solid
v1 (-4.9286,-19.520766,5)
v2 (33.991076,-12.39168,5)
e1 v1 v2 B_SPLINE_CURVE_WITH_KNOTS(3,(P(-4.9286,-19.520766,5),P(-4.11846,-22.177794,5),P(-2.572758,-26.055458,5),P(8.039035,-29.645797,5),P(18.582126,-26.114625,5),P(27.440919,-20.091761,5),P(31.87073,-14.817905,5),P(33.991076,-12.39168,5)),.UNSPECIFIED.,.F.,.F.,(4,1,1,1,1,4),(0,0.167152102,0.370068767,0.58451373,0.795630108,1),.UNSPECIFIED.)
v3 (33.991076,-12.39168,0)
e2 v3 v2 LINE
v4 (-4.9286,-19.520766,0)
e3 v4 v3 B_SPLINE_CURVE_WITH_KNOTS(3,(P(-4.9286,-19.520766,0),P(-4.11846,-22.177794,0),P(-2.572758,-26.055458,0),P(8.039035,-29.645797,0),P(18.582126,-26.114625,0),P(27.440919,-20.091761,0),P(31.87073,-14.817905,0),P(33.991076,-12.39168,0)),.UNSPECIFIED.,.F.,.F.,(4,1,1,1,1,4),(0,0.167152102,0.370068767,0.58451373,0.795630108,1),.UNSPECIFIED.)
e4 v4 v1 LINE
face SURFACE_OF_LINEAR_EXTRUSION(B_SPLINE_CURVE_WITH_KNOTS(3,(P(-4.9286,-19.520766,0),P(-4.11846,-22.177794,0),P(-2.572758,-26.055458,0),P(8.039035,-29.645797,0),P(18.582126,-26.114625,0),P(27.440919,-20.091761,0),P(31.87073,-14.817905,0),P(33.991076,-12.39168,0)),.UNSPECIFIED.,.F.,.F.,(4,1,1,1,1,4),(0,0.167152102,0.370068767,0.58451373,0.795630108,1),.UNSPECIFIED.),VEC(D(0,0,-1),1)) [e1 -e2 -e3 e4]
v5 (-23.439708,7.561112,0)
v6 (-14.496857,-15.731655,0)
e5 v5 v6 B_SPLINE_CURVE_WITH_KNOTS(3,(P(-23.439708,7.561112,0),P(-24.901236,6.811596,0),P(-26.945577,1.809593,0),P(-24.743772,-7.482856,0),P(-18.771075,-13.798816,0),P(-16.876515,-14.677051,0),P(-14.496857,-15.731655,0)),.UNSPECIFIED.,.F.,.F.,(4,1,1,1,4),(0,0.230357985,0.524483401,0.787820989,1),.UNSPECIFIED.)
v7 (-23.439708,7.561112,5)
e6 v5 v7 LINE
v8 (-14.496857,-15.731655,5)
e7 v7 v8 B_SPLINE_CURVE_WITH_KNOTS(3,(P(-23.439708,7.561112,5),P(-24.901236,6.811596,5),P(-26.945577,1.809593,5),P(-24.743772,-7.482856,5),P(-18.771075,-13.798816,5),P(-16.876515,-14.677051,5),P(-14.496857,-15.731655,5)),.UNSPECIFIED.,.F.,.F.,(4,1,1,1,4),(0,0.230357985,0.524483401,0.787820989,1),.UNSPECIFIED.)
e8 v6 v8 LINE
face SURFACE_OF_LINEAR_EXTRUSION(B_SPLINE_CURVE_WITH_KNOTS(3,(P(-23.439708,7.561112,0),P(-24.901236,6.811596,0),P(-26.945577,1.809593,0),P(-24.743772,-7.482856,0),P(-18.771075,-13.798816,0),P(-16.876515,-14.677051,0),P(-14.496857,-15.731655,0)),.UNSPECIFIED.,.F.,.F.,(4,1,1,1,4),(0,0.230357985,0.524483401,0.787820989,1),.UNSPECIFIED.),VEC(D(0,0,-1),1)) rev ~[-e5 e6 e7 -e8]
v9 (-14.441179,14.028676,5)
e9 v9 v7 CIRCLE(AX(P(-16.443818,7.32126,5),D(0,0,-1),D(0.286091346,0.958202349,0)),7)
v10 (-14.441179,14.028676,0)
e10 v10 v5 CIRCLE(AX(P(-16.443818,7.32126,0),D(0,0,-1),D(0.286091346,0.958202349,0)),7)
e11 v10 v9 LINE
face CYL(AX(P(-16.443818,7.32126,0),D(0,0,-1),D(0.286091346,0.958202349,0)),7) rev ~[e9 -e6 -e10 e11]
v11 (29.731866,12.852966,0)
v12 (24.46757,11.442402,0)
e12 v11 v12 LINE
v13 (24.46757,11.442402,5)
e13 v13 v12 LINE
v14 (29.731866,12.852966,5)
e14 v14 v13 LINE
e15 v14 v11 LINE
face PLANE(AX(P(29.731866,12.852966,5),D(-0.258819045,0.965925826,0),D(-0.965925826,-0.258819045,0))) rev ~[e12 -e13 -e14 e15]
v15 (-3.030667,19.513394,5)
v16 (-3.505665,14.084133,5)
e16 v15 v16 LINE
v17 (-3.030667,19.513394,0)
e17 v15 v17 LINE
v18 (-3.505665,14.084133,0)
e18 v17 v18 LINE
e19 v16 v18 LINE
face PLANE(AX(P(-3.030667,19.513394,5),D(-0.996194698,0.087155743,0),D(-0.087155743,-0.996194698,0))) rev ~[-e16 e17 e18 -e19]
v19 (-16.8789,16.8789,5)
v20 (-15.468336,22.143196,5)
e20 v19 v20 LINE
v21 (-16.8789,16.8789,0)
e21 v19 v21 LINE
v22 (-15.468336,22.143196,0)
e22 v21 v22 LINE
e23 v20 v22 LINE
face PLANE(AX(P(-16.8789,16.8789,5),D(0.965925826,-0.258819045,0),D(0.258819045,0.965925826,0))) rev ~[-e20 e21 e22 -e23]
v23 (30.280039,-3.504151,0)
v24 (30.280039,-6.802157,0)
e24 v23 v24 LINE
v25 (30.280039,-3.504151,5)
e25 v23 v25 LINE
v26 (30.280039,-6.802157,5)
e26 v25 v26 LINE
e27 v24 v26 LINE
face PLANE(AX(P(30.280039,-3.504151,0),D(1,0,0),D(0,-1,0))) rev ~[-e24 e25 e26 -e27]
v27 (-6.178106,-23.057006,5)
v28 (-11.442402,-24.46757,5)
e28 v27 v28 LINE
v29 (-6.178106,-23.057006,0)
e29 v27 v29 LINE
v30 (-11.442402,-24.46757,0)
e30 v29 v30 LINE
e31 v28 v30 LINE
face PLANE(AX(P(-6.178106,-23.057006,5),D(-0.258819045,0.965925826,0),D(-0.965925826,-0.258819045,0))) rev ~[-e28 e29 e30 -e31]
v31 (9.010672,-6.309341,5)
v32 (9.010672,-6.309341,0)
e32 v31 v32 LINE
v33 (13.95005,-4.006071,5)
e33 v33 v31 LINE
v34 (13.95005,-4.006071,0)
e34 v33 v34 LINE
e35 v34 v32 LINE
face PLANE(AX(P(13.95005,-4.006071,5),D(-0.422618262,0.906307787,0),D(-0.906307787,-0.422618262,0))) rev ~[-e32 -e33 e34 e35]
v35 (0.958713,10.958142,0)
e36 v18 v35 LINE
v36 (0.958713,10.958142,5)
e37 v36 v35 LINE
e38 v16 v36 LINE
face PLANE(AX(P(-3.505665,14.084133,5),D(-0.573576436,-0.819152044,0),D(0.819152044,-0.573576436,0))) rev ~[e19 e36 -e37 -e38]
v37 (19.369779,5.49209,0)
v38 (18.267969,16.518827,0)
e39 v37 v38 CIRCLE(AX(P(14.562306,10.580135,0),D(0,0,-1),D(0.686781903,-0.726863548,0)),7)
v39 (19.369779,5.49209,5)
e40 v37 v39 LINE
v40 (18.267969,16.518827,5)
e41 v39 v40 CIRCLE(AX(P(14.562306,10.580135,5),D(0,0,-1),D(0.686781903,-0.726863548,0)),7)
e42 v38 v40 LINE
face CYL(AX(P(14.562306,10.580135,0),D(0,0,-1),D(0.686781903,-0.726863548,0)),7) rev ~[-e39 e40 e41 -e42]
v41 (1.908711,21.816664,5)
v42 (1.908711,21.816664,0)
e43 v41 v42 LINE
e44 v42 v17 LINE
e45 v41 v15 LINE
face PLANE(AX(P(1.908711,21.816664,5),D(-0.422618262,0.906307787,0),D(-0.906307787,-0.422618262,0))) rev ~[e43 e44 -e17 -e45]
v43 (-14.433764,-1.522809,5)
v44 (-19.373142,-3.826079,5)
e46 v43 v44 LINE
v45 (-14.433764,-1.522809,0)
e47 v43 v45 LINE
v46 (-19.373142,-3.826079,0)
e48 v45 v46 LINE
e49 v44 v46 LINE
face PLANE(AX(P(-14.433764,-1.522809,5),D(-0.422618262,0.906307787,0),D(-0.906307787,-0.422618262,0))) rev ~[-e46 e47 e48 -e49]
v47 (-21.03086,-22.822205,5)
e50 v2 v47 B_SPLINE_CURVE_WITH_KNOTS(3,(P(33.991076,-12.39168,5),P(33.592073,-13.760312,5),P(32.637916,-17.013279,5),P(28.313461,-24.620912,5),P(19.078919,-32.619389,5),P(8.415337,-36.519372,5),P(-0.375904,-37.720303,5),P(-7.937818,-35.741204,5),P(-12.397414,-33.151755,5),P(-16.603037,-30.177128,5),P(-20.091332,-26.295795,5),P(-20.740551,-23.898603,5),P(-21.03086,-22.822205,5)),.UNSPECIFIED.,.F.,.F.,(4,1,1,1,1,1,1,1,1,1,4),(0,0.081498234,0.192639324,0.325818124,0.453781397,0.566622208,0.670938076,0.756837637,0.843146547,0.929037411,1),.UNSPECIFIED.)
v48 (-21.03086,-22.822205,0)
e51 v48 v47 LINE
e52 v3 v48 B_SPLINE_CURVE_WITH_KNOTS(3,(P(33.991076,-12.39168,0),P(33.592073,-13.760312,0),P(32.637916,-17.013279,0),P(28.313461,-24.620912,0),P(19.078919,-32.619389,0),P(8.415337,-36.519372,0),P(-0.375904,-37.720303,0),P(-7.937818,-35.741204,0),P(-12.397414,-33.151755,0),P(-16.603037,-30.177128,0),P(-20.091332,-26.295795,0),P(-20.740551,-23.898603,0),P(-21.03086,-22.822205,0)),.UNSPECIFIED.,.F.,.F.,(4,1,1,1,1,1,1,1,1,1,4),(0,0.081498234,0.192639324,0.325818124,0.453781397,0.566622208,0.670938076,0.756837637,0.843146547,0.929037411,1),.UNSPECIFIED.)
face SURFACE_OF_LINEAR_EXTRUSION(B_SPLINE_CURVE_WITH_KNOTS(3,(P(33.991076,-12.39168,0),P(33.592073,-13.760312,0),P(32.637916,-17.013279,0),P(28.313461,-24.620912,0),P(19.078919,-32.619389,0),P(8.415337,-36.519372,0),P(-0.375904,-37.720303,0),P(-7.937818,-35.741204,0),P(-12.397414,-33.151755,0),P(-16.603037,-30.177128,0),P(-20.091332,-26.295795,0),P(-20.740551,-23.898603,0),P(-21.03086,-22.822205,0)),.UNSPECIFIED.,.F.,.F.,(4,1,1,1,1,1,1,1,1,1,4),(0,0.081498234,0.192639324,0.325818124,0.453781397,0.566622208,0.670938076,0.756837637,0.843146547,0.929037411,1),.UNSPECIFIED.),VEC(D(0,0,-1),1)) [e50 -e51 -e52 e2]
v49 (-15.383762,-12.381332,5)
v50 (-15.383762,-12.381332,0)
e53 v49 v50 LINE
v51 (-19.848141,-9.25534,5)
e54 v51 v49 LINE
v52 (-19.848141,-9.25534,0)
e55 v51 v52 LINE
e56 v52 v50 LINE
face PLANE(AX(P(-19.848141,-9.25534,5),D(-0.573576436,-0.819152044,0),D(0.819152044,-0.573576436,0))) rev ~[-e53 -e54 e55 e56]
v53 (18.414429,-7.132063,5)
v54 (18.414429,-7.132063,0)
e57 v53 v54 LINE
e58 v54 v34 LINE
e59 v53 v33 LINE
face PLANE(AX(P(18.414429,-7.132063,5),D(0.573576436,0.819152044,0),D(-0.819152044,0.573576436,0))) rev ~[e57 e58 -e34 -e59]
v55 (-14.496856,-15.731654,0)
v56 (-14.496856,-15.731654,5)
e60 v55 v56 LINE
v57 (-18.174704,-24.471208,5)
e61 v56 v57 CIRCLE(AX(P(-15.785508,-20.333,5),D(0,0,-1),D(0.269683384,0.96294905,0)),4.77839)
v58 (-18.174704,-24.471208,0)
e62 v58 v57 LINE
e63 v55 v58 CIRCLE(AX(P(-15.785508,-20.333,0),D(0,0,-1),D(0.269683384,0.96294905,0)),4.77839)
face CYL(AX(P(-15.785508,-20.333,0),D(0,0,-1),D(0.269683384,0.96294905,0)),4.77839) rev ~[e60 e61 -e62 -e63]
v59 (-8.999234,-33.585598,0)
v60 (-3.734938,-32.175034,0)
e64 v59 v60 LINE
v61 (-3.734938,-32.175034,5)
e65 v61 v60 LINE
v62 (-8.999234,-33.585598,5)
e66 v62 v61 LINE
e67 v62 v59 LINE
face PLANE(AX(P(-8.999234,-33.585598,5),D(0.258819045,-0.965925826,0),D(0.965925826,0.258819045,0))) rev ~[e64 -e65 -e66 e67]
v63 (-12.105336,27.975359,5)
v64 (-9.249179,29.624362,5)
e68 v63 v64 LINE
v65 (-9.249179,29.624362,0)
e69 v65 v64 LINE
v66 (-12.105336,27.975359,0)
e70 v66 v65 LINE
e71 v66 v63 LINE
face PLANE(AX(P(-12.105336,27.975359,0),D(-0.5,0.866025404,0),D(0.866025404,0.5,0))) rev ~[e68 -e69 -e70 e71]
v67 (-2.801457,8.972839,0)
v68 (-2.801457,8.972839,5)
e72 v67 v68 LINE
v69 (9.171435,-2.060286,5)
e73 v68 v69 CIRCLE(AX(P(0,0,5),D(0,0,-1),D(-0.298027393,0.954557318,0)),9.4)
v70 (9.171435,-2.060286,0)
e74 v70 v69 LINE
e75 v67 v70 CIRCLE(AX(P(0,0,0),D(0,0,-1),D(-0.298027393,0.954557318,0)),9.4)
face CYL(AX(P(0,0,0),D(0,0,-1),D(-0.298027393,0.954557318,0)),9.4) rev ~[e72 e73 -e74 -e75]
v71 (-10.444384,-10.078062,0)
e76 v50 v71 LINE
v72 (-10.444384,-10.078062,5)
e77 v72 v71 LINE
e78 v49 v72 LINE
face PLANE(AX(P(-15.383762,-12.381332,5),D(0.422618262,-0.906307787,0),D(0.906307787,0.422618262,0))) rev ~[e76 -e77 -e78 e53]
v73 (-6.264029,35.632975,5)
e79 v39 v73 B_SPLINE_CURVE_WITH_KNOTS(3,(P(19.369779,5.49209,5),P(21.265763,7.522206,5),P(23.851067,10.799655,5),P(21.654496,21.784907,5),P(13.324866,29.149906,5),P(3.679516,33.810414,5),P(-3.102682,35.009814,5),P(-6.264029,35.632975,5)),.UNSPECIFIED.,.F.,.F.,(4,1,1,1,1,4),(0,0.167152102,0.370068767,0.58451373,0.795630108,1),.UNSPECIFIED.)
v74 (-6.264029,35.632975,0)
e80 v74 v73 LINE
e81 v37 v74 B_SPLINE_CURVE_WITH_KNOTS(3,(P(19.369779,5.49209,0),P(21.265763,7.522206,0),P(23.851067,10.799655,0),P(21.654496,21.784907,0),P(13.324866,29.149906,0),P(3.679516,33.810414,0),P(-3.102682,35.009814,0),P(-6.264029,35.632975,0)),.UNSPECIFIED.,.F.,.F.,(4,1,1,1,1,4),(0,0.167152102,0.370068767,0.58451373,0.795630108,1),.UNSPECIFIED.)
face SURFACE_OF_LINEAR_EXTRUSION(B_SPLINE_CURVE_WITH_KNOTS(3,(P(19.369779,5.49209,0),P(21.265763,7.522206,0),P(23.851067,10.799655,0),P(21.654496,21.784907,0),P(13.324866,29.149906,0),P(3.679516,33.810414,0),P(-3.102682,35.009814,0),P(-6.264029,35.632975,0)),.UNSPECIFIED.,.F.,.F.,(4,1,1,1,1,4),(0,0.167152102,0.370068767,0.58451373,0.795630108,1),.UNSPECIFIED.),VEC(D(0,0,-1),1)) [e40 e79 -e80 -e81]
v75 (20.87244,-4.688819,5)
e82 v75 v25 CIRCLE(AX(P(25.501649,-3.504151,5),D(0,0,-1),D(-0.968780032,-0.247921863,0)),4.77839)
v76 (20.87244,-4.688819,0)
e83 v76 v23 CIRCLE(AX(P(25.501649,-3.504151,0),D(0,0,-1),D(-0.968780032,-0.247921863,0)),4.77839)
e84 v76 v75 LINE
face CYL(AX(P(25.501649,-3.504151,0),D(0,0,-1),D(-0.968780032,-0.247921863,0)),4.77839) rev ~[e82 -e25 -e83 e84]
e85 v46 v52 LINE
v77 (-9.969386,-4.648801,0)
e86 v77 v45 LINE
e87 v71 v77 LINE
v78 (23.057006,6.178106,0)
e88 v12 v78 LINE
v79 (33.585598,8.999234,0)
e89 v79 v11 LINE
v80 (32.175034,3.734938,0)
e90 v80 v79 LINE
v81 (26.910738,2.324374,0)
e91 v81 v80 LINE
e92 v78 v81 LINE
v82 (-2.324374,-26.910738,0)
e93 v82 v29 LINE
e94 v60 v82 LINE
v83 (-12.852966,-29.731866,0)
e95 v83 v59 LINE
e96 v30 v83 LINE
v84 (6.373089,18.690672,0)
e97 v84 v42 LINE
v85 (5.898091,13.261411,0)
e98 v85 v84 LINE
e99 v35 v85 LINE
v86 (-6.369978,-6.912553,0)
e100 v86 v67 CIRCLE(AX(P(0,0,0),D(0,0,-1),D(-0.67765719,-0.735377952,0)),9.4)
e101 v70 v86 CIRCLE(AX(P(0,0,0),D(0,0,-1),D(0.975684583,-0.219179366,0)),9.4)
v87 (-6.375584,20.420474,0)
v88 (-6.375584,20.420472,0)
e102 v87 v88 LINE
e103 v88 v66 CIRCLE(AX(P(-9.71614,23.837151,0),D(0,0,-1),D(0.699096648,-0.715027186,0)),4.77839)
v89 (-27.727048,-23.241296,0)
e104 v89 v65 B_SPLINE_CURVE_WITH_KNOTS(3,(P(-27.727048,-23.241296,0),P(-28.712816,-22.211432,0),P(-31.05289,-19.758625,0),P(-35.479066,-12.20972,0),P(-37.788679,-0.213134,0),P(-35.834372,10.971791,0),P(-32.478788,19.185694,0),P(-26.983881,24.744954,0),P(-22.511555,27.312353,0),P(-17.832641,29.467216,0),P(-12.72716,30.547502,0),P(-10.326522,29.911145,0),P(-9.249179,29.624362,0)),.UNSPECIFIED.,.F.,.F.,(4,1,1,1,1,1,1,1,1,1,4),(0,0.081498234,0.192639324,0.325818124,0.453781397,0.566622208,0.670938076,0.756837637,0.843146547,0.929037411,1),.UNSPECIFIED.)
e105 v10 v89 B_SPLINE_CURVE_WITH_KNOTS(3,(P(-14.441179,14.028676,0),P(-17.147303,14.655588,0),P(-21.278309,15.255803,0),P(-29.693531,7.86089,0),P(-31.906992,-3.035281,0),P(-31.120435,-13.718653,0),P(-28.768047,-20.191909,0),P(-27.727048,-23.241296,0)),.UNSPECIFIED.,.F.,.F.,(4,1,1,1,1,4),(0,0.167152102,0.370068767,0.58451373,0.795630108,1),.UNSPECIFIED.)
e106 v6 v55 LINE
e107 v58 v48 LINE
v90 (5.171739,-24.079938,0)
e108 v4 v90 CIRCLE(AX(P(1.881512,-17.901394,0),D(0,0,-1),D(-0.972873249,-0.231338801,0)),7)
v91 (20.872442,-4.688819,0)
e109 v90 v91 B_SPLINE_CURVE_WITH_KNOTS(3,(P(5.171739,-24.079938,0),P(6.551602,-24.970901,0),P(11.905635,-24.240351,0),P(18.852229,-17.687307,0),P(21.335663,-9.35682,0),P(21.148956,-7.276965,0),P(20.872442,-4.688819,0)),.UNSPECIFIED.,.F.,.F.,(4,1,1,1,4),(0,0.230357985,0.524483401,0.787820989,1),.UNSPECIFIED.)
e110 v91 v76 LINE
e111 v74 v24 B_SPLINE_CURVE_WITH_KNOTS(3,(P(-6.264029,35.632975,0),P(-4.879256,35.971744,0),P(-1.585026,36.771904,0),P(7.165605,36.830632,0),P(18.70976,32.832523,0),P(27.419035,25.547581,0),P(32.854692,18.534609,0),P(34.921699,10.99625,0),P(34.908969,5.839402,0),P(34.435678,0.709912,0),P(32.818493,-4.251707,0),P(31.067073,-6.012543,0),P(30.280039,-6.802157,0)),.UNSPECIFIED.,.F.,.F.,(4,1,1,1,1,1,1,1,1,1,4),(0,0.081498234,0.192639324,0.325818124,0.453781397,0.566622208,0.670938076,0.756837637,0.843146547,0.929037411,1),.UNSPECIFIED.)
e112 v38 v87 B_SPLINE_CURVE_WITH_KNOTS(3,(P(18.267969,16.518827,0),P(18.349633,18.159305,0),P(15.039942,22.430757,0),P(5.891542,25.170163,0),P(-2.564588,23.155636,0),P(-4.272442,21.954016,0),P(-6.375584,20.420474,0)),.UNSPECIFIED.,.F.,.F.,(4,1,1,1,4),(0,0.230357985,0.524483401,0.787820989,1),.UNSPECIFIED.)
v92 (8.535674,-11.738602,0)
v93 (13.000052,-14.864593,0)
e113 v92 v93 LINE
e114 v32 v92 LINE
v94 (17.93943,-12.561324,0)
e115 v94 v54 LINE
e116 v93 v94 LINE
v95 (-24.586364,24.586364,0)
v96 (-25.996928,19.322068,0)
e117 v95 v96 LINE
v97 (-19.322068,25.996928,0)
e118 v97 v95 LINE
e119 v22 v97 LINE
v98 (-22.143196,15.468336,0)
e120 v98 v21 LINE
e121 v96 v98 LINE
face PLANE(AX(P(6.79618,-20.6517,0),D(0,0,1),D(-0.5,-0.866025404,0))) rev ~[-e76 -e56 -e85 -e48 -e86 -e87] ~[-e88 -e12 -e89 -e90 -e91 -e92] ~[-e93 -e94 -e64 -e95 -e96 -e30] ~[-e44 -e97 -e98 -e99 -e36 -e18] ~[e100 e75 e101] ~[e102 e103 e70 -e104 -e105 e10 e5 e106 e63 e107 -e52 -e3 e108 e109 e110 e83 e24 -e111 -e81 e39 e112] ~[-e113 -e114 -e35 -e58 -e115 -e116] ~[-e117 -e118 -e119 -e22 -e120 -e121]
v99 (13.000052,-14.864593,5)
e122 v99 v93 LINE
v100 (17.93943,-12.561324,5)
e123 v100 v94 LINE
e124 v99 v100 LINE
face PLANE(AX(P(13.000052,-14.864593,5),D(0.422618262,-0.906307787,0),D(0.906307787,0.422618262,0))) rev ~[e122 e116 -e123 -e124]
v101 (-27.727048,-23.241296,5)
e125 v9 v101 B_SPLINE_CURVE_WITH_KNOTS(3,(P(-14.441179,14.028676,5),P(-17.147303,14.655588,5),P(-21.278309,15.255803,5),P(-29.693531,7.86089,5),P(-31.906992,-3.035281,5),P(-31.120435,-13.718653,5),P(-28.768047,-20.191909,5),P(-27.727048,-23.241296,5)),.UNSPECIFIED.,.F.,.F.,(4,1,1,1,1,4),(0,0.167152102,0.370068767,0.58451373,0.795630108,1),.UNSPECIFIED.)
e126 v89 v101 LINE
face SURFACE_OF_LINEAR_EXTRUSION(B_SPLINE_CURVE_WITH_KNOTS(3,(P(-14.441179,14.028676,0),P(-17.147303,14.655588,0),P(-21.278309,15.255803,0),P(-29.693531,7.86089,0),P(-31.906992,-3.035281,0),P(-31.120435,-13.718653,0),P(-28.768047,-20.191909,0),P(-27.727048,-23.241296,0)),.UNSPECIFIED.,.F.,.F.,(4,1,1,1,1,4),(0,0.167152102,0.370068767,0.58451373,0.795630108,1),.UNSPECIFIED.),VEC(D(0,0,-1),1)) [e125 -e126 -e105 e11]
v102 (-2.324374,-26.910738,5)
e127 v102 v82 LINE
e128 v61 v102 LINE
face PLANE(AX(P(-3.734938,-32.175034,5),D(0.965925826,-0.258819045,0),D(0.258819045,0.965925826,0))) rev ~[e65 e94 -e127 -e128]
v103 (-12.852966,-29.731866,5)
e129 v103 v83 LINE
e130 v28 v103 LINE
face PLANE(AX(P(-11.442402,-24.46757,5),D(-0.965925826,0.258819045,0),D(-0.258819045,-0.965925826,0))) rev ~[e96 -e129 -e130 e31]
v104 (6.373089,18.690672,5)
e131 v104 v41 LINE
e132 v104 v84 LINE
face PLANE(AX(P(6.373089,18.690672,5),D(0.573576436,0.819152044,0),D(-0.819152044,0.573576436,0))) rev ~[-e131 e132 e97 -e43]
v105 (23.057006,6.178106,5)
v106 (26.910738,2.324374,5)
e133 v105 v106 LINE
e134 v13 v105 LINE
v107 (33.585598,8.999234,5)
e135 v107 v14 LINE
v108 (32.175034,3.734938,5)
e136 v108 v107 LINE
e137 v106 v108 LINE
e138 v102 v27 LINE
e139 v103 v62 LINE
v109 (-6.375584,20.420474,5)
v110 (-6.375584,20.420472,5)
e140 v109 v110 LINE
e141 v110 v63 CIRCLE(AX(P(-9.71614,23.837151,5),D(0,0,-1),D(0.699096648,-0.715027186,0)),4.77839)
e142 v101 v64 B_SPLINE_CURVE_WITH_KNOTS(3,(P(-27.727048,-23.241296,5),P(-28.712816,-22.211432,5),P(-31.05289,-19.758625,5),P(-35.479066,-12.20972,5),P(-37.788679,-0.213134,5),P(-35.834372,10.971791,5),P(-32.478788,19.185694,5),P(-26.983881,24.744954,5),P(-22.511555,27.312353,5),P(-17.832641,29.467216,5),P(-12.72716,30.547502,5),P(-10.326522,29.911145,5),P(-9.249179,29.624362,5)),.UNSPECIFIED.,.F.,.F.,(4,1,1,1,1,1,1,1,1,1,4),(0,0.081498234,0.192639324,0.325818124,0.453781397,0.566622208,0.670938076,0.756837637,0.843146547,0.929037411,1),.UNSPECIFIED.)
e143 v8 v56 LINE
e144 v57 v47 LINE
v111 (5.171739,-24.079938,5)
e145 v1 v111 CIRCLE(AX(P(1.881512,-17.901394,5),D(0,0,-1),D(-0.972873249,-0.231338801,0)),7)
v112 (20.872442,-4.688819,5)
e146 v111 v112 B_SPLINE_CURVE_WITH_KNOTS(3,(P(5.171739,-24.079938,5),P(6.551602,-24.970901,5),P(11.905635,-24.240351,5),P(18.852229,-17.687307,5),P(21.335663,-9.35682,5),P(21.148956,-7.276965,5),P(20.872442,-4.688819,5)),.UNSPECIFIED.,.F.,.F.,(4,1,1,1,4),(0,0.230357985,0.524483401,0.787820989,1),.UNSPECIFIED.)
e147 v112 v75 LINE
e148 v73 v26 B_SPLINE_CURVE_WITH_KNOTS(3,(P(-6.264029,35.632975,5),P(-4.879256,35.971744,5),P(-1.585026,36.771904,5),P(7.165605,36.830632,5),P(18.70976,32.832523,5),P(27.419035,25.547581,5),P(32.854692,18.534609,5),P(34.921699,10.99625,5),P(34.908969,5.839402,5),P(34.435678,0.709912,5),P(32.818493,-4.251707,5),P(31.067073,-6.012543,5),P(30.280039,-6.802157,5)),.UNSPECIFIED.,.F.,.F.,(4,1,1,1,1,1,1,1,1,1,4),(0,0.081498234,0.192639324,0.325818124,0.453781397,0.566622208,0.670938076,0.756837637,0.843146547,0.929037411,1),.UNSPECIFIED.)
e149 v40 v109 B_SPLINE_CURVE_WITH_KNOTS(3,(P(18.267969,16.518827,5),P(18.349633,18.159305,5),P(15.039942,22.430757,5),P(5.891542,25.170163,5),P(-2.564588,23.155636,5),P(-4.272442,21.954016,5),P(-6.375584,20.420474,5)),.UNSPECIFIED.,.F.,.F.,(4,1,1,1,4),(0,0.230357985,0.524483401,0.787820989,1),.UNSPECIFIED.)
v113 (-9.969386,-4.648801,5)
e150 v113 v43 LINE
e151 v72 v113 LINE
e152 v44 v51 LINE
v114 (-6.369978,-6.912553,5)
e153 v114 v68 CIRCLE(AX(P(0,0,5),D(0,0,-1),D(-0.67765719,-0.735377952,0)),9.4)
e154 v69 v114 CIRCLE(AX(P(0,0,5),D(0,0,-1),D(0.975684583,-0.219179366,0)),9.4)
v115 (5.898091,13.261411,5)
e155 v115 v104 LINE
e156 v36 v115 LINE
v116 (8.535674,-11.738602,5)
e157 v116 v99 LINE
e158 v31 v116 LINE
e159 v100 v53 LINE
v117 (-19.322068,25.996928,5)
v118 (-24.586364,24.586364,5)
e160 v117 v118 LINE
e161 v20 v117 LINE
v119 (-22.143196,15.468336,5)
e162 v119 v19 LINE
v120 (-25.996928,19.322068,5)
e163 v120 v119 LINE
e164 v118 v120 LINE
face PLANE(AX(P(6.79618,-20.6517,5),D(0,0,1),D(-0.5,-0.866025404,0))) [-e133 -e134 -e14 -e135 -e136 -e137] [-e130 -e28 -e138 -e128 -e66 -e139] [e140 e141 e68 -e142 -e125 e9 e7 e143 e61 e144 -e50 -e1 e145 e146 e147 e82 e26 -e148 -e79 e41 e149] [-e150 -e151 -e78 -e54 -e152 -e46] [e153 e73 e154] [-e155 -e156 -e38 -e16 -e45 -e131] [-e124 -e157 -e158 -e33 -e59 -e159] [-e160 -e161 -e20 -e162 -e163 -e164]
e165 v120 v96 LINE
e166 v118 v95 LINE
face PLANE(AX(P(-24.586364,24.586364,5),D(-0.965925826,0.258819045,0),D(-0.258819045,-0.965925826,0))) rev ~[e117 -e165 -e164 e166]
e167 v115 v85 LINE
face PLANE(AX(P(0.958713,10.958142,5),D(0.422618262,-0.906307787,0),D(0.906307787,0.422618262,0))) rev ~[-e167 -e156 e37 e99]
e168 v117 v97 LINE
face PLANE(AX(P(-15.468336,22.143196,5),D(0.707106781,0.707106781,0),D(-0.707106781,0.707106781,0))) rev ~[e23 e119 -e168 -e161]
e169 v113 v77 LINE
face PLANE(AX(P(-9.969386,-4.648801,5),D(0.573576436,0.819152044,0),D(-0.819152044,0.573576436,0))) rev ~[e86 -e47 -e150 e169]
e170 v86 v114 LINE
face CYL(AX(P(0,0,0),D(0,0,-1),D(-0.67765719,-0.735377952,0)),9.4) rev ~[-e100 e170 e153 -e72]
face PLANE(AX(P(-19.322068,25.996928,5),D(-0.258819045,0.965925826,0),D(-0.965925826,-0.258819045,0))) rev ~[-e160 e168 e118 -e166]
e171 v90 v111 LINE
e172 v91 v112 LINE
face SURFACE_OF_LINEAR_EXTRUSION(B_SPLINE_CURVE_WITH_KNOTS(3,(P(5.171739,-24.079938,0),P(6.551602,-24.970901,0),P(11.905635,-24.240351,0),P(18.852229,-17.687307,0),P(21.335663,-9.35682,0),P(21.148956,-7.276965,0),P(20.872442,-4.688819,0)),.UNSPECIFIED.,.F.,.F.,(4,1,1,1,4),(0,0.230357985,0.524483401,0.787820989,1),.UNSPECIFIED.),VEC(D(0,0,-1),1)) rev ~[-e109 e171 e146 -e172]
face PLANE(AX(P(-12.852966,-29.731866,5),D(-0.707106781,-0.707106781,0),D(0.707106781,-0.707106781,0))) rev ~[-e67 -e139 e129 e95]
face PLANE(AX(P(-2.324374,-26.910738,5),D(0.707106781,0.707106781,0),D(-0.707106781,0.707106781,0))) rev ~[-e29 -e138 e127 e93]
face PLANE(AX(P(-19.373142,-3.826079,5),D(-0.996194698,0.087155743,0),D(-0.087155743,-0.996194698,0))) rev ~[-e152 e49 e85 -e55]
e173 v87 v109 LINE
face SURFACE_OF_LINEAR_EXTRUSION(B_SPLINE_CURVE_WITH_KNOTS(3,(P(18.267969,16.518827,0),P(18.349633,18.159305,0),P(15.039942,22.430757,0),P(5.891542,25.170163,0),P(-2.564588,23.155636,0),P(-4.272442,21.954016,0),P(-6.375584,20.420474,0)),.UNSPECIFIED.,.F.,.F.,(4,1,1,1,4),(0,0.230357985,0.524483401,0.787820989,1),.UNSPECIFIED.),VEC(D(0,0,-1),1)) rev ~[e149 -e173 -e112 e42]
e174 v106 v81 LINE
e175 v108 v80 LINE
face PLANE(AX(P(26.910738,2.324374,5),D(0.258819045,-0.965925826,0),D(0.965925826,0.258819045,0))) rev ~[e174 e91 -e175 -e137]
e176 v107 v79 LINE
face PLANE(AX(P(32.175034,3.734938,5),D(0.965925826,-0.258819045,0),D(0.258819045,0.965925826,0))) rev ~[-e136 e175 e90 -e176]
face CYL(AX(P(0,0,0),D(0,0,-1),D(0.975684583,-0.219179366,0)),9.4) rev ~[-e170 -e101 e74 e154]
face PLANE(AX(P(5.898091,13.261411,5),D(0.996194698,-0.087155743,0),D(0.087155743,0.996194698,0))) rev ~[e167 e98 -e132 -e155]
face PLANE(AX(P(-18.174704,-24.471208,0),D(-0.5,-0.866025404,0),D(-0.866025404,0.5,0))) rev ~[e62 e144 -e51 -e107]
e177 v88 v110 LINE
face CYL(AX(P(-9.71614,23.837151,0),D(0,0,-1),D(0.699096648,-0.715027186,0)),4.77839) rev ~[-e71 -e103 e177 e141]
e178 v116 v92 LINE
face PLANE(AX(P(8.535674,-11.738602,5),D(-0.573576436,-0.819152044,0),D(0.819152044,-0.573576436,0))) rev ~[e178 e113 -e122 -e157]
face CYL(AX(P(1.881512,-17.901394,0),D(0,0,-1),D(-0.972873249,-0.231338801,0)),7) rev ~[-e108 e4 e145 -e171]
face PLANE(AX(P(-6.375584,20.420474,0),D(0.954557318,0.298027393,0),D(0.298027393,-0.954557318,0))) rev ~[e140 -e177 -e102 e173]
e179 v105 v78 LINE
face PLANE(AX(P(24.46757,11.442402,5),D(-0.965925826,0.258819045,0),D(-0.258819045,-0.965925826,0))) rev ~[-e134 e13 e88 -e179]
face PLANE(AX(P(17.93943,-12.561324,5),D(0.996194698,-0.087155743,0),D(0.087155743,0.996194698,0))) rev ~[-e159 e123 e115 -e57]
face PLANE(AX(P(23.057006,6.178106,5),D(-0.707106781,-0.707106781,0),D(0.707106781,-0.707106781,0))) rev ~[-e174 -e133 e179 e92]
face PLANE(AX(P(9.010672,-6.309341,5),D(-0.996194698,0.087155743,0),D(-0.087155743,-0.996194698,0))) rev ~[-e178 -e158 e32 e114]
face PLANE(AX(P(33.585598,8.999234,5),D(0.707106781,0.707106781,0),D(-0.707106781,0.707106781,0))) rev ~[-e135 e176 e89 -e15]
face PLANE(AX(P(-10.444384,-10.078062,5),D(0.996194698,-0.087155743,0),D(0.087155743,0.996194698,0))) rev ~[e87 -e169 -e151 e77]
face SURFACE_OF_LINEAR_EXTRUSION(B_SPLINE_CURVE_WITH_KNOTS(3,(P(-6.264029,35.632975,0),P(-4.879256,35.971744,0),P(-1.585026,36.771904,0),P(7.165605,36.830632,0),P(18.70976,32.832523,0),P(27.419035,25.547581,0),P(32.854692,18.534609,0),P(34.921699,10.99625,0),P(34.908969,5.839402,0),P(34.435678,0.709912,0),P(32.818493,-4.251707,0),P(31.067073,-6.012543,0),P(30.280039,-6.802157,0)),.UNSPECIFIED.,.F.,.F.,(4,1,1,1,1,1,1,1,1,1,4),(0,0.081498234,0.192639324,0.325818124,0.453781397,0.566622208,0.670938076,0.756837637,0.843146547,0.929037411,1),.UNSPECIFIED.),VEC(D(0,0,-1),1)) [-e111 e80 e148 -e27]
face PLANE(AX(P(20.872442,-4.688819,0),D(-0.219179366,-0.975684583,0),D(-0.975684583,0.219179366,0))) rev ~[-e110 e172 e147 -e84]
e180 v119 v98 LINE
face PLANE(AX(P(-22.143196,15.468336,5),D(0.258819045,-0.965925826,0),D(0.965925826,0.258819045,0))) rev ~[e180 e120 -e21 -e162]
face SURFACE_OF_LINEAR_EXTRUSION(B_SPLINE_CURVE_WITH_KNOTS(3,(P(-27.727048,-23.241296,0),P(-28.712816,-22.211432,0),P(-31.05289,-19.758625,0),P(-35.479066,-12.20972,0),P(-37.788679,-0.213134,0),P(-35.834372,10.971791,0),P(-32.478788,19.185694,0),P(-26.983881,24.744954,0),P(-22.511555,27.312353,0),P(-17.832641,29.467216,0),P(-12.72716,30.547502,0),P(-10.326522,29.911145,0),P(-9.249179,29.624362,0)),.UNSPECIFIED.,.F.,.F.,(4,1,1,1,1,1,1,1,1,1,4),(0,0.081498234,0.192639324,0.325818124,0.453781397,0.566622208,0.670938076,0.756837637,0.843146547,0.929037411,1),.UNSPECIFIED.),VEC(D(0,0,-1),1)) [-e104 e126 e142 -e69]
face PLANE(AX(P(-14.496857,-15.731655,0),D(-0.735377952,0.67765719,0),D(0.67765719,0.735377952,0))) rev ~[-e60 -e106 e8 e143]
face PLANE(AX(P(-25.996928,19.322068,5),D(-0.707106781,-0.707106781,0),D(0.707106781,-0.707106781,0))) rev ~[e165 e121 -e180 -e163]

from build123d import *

# Parameters (mm, degrees)
F1_DEPTH = 5
F3_COUNT = 3
F5_DEPTH = 25
F6_DEPTH = 25


# Not quite as in the source:
# - a feature names something its author has since deleted; it is built from what else it names


with BuildPart() as f1:
    # F0 (on Top) → F1 (new body)
    with BuildSketch(Plane.XY):
        with BuildLine():
            ThreePointArc((19.3697792191, 5.4920897032), (7.5969915996, 9.8841483966), (18.2679687724, 16.5188265409))
            add(Edge.make_bspline(
                [(18.2679687724, 16.5188265409), (18.3496331671, 18.159304569), (15.0399422234, 22.4307572674), (5.8915424323, 25.1701629139), (-2.5645877448, 23.1556361007), (-4.2724416569, 21.9540160804), (-6.3755843906, 20.4204743588)],
                knots=[0, 0, 0, 0, 0.2303579847, 0.5244834011, 0.7878209886, 1, 1, 1, 1], degree=3))
            Line((-6.3755843906, 20.4204743588), (-2.8014574936, 8.9728387878))
            ThreePointArc((-2.8014574936, 8.9728387878), (6.3699775875, 6.9125527509), (9.1714350811, -2.0602860368))
            Line((9.1714350811, -2.0602860368), (20.8724397691, -4.6888186888))
            ThreePointArc((20.8724397691, -4.6888186888), (24.9046372172, 1.2367971287), (30.2800393035, -3.5041512456))
            Line((30.2800393035, -3.5041512456), (30.2800393035, -6.8021570911))
            add(Edge.make_bspline(
                [(-6.2640286051, 35.6329753995), (-4.879256488, 35.9717442203), (-1.585026432, 36.7719038353), (7.1656047644, 36.8306324291), (18.7097595399, 32.8325229218), (27.4190354107, 25.5475811449), (32.854692365, 18.5346088809), (34.9216993048, 10.9962495512), (34.9089688496, 5.8394018473), (34.4356780994, 0.7099122454), (32.81849257, -4.2517065064), (31.0670725646, -6.0125426883), (30.2800393035, -6.8021570911)],
                knots=[0, 0, 0, 0, 0.0814982335, 0.1926393238, 0.3258181235, 0.4537813969, 0.5666222077, 0.6709380758, 0.7568376371, 0.8431465468, 0.9290374106, 1, 1, 1, 1], degree=3))
            add(Edge.make_bspline(
                [(19.3697792191, 5.4920897032), (21.2657632456, 7.5222061316), (23.8510672601, 10.7996552166), (21.6544956387, 21.7849070989), (13.3248656234, 29.1499061822), (3.6795158583, 33.8104137468), (-3.1026823793, 35.0098141612), (-6.2640286051, 35.6329753995)],
                knots=[0, 0, 0, 0, 0.167152102, 0.3700687673, 0.5845137295, 0.7956301076, 1, 1, 1, 1], degree=3))
        make_face()
    extrude(amount=F1_DEPTH)

    # F3: F1 ×3 about axis
    f3_axis = Axis((0, 0, 27.9298778623), (0, 0, 1))


with BuildPart() as f1_1:
    add(f1.part)
    for i in range(1, F3_COUNT):
        add(f1.part.rotate(f3_axis, i * 360 / F3_COUNT))

    # F4 (on face) → F5 (cut)
    with BuildSketch(Plane.XY.offset(5)):
        Polygon((-3.5056654712, 14.0841332571), (0.9587131702, 10.958141679), (5.8980906096, 13.2614112055), (6.3730894075, 18.6906723101), (1.9087107662, 21.8166638882), (-3.0306666732, 19.5133943617), align=None)
        Polygon((13.0000523306, -14.8645934826), (17.9394297699, -12.5613239561), (18.4144285679, -7.1320628515), (13.9500499265, -4.0060712734), (9.0106724872, -6.3093407999), (8.5356736892, -11.7386019045), align=None)
        Polygon((-19.3731417381, -3.8260788275), (-19.8481405361, -9.2553399321), (-15.3837618947, -12.3813315102), (-10.4443844554, -10.0780619837), (-9.9693856574, -4.6488008791), (-14.4337642988, -1.522809301), align=None)
    extrude(amount=-F5_DEPTH, mode=Mode.SUBTRACT)

    # F4 (on face) → F6 (cut)
    with BuildSketch(Plane.XY.offset(5)):
        Polygon((-19.322068234, 25.9969277831), (-24.5863639873, 24.5863639873), (-25.9969277831, 19.322068234), (-22.1431958256, 15.4683362766), (-16.8789000724, 16.8789000724), (-15.4683362766, 22.1431958256), align=None)
        Polygon((32.1750339975, 3.7349380528), (33.5855977933, 8.999233806), (29.7318658359, 12.8529657635), (24.4675700826, 11.4424019677), (23.0570062868, 6.1781062144), (26.9107382443, 2.324374257), align=None)
        Polygon((-12.8529657635, -29.7318658359), (-8.999233806, -33.5855977933), (-3.7349380528, -32.1750339975), (-2.324374257, -26.9107382443), (-6.1781062144, -23.0570062868), (-11.4424019677, -24.4675700826), align=None)
    extrude(amount=-F6_DEPTH, mode=Mode.SUBTRACT)


solid = f1_1.part
